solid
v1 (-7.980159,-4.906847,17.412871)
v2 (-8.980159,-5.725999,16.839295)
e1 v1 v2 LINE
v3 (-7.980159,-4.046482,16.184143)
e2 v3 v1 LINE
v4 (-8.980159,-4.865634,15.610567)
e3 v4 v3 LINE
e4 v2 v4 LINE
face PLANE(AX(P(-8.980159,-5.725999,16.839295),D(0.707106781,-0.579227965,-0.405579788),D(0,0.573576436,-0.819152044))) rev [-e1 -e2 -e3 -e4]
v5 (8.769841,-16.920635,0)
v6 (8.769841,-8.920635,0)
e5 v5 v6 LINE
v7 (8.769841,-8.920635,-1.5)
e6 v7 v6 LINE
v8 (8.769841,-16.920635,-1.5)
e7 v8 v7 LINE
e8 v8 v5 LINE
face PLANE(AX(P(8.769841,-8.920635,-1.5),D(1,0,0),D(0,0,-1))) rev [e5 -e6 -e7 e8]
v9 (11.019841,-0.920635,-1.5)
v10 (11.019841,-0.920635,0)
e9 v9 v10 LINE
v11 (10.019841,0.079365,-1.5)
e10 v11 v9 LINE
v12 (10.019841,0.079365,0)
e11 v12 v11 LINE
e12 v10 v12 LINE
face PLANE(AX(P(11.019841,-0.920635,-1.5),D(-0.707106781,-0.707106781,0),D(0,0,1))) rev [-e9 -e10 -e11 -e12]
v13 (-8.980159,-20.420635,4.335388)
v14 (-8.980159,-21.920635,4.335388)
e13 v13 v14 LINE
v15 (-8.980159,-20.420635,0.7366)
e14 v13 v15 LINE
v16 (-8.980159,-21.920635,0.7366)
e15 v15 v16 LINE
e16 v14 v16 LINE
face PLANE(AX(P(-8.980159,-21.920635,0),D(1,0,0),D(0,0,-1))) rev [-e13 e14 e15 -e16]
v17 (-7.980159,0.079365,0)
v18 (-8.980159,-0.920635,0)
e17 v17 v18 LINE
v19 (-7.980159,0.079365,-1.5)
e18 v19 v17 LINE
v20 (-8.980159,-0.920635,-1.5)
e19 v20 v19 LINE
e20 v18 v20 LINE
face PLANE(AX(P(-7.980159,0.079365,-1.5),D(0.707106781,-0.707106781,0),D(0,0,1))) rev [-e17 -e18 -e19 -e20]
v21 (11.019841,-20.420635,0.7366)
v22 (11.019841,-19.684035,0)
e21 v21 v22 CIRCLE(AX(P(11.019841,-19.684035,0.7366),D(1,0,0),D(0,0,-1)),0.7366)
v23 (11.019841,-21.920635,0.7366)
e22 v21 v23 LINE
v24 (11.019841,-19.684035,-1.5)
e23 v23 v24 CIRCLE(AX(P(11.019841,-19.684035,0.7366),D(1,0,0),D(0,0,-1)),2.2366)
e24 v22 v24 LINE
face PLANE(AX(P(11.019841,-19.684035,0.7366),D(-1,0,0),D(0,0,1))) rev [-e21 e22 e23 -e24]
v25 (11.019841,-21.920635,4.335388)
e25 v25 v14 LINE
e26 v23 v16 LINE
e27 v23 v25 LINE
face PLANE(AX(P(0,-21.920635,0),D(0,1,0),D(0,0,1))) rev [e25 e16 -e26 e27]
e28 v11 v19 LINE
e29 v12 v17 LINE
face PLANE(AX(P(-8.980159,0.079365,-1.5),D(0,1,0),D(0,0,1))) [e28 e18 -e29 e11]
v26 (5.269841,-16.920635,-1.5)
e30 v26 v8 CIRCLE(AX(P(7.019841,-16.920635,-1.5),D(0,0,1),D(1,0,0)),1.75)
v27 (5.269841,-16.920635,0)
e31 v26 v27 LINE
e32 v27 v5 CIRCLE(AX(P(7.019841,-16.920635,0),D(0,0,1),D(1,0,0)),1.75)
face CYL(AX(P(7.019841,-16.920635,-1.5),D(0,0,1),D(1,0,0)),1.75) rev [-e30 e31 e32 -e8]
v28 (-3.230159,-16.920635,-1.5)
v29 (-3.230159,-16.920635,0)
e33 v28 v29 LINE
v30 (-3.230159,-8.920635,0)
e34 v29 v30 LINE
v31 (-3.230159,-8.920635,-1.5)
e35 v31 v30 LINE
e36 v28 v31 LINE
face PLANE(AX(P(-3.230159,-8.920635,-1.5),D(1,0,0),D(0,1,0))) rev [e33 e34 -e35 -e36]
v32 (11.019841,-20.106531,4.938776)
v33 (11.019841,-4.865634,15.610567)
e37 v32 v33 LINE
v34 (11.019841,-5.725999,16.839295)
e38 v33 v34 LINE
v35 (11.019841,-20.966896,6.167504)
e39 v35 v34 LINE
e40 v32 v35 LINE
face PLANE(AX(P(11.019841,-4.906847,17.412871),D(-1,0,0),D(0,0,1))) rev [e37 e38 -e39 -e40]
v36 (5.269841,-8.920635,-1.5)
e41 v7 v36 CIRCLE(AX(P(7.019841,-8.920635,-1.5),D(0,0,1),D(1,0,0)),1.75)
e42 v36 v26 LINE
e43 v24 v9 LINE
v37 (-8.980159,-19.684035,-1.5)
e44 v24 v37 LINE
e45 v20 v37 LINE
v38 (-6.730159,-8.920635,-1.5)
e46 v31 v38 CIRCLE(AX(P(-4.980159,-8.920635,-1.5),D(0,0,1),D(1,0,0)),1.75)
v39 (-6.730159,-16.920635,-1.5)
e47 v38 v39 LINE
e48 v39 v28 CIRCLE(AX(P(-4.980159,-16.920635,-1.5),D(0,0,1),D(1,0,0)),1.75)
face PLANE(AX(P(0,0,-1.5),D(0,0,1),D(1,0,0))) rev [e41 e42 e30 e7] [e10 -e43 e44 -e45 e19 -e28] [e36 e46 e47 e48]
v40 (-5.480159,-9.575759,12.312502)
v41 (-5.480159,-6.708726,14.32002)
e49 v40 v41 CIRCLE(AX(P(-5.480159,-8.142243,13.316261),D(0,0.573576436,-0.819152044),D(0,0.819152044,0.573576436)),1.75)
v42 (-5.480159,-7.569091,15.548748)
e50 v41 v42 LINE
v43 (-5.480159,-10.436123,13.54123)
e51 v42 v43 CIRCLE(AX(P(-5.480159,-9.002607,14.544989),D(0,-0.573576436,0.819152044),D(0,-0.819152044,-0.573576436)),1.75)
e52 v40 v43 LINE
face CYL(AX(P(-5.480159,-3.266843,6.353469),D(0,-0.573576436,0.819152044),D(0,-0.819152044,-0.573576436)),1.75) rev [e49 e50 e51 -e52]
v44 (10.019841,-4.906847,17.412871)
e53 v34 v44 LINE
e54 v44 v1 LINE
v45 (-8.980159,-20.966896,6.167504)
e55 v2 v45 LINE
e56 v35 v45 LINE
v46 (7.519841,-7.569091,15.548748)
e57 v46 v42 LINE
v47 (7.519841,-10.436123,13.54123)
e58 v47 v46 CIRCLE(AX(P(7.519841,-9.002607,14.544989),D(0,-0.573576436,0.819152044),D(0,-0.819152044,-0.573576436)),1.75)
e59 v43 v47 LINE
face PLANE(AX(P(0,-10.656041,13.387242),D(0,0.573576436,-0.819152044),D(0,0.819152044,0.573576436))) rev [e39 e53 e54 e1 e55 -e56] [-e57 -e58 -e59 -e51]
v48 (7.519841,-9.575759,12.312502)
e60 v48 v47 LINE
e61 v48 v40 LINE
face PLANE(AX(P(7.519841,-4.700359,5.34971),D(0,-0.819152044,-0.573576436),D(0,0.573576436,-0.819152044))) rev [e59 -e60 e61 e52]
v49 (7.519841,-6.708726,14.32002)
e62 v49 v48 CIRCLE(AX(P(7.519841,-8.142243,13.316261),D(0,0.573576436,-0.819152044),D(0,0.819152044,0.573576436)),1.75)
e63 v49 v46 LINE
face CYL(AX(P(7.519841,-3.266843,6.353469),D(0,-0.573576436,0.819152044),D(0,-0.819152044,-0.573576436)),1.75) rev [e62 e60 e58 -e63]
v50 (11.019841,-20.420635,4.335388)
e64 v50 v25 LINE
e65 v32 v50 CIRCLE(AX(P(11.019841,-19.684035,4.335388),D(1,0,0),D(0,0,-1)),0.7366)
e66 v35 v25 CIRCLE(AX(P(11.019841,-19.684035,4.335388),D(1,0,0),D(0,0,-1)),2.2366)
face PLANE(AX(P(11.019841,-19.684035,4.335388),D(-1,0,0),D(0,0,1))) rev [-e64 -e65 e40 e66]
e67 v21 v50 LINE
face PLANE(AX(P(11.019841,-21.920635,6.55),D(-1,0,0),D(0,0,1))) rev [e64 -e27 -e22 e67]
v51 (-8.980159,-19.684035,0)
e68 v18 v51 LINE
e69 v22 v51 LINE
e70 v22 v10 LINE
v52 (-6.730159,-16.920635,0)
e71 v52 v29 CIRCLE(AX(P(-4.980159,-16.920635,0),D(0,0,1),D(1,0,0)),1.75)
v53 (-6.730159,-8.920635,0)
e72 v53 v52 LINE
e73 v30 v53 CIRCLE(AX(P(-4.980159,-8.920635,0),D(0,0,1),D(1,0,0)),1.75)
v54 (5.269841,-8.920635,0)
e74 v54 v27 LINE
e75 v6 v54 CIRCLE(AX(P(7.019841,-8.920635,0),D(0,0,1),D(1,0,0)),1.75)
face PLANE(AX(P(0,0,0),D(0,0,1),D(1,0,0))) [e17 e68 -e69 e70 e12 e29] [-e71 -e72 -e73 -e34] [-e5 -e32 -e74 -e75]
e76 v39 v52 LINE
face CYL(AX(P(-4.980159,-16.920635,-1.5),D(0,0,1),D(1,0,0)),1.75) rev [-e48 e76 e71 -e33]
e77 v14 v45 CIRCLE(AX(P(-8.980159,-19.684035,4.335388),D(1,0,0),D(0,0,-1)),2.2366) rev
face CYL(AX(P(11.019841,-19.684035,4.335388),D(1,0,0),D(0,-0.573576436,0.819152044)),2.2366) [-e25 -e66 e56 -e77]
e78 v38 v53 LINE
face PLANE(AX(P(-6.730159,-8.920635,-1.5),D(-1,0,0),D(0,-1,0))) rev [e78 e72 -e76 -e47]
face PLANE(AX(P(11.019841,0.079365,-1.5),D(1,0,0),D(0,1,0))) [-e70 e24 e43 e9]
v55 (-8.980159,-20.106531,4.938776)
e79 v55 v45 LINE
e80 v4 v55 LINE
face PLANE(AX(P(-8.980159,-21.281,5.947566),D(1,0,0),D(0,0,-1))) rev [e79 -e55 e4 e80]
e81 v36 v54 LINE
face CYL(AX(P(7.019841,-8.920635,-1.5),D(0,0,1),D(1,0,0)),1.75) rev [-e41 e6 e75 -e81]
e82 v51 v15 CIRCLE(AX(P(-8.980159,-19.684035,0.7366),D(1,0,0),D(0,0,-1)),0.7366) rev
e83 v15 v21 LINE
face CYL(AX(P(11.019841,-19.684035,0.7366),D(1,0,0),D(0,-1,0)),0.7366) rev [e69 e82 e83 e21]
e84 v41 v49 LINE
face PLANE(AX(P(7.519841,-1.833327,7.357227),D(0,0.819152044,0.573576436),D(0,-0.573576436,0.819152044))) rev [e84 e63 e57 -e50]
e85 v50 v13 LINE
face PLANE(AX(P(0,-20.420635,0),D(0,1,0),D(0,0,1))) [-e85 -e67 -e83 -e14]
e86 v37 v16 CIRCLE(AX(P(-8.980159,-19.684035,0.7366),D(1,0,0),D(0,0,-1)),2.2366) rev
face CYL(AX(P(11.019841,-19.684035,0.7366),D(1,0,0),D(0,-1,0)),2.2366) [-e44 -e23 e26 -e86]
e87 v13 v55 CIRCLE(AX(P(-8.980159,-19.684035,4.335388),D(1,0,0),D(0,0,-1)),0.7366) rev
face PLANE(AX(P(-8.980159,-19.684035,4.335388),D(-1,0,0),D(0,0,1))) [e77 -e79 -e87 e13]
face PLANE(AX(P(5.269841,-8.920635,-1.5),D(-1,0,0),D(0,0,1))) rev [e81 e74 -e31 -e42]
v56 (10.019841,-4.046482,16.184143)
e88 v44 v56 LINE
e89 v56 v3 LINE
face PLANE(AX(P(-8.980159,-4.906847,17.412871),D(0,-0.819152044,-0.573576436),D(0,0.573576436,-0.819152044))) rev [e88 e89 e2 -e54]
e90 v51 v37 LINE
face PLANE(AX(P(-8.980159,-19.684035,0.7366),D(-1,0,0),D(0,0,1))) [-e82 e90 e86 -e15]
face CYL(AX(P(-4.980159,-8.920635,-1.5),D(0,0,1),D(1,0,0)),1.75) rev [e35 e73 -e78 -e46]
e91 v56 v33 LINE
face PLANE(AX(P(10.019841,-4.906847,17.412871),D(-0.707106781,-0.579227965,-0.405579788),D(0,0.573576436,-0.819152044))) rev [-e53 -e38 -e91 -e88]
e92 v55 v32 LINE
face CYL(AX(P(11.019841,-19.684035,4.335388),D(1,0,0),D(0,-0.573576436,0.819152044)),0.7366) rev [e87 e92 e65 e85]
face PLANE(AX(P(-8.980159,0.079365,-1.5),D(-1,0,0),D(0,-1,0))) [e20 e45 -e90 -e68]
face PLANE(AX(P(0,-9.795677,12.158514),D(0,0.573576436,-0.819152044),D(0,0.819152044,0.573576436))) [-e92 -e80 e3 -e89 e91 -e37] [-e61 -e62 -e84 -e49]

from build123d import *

# Parameters (mm, degrees)
SKETCH1_W                    = 20
SKETCH1_H                    = 22
BASE_FLANGE1_DEPTH           = 1.5
EDGE_FLANGE1_STRIP_W         = 7.4732
EDGE_FLANGE1_STRIP_H         = 1.5
EDGE_FLANGE1_STRIP_CUT_DEPTH = 20
EDGE_FLANGE1_DEPTH           = 20
EDGE_FLANGE2_START           = -8.98015873
EDGE_FLANGE2_DEPTH           = 20
EDGE_FLANGE2_2_DEPTH         = 20
CUT_EXTRUDE1_DEPTH           = 10
CHAMFER1_SIZE                = 1
CHAMFER2_SIZE                = 1


# Read off the part's stored shape, not the designer's step: Edge-Flange2
# Sheet-metal steps are written as plain solids
with BuildPart() as part:
    # Sketch1 → Base-Flange1 (new body)
    with BuildSketch(Plane.XY):
        with Locations((1.01984127, -10.920634921)):
            Rectangle(SKETCH1_W, SKETCH1_H)
        with BuildLine():
            Line((-6.73015873, -8.920634921), (-6.73015873, -16.920634921))
            ThreePointArc((-6.73015873, -16.920634921), (-4.98015873, -18.670634921), (-3.23015873, -16.920634921))
            Line((-3.23015873, -16.920634921), (-3.23015873, -8.920634921))
            ThreePointArc((-3.23015873, -8.920634921), (-4.98015873, -7.170634921), (-6.73015873, -8.920634921))
        make_face(mode=Mode.SUBTRACT)
        with BuildLine():
            Line((5.26984127, -8.920634921), (5.26984127, -16.920634921))
            ThreePointArc((5.26984127, -16.920634921), (7.01984127, -18.670634921), (8.76984127, -16.920634921))
            Line((8.76984127, -16.920634921), (8.76984127, -8.920634921))
            ThreePointArc((8.76984127, -8.920634921), (7.01984127, -7.170634921), (5.26984127, -8.920634921))
        make_face(mode=Mode.SUBTRACT)
    extrude(amount=-BASE_FLANGE1_DEPTH)

    # Edge-Flange1 strip (across the edge) → Edge-Flange1 strip cut (cut)
    with BuildSketch(Plane(origin=(-8.98015873, -21.920634921, 0), x_dir=(0, 1, 0), z_dir=(1, 0, 0))):
        with Locations((-1.5, -0.75)):
            Rectangle(EDGE_FLANGE1_STRIP_W, EDGE_FLANGE1_STRIP_H)
    extrude(amount=EDGE_FLANGE1_STRIP_CUT_DEPTH, mode=Mode.SUBTRACT)

    # Edge-Flange1 section (across the edge) → Edge-Flange1 (add)
    with BuildSketch(Plane(origin=(-8.98015873, -21.920634921, 0), x_dir=(0, 1, 0), z_dir=(1, 0, 0))):
        with BuildLine():
            Line((0, 0.7366), (0, 6.55))
            Line((0, 6.55), (1.5, 6.55))
            Line((1.5, 6.55), (1.5, 0.7366))
            ThreePointArc((1.5, 0.7366), (1.715745145, 0.215745145), (2.2366, 0))
            Line((2.2366, 0), (2.2366, -1.5))
            ThreePointArc((2.2366, -1.5), (0.655084973, -0.844915027), (0, 0.7366))
        make_face()
    extrude(amount=EDGE_FLANGE1_DEPTH)

    # Edge-Flange2 outline → Edge-Flange2 (cut)
    with BuildSketch(Plane.YZ.offset(EDGE_FLANGE2_START)):
        with BuildLine():
            ThreePointArc((-21.920634921, 4.335388427), (-21.66792335, 5.368135376), (-20.966895978, 6.16750389))
            Line((-20.966895978, 6.16750389), (-20.420634921, 6.55))
            Line((-20.420634921, 6.55), (-21.920634921, 6.55))
            Line((-21.920634921, 6.55), (-21.920634921, 4.335388427))
        make_face()
    extrude(amount=EDGE_FLANGE2_DEPTH, mode=Mode.SUBTRACT)

    # Edge-Flange2 2 outline → Edge-Flange2 2 (add)
    with BuildSketch(Plane.YZ.offset(EDGE_FLANGE2_START)):
        with BuildLine():
            Line((-4.906846961, 17.412871276), (-20.420634921, 6.55))
            Line((-20.420634921, 6.55), (-20.420634921, 4.335388427))
            ThreePointArc((-20.420634921, 4.335388427), (-20.3374071, 4.675512455), (-20.106531324, 4.938775823))
            Line((-20.106531324, 4.938775823), (-4.046482306, 16.184143209))
            Line((-4.046482306, 16.184143209), (-4.906846961, 17.412871276))
        make_face()
    extrude(amount=EDGE_FLANGE2_2_DEPTH)

    # Sketch12 → Cut-Extrude1 (cut)
    with BuildSketch(Plane(origin=(0, -9.795676552, 13.989675943), x_dir=(1, 0, 0), z_dir=(0, -0.5735764363510533, 0.8191520442889869))):
        with BuildLine():
            Line((7.51984127, -0.781841066), (-5.48015873, -0.781841066))
            ThreePointArc((-5.48015873, -0.781841066), (-7.23015873, 0.968158934), (-5.48015873, 2.718158934))
            Line((-5.48015873, 2.718158934), (7.51984127, 2.718158934))
            ThreePointArc((7.51984127, 2.718158934), (9.26984127, 0.968158934), (7.51984127, -0.781841066))
        make_face()
    extrude(amount=-CUT_EXTRUDE1_DEPTH, mode=Mode.SUBTRACT)

    # Chamfer1
    chamfer1_edges = [part.edges().sort_by_distance(p)[0] for p in [
        (11.01984127, 0.079365079, -0.75),
    ]]
    chamfer(chamfer1_edges, length=CHAMFER1_SIZE)

    # Chamfer2
    chamfer2_edges = [part.edges().sort_by_distance(p)[0] for p in [
        (-8.98015873, 0.079365079, -0.75),
        (-8.98015873, -4.476664634, 16.798507243),
        (11.01984127, -4.476664634, 16.798507243),
    ]]
    chamfer(chamfer2_edges, length=CHAMFER2_SIZE)


solid = part.part
